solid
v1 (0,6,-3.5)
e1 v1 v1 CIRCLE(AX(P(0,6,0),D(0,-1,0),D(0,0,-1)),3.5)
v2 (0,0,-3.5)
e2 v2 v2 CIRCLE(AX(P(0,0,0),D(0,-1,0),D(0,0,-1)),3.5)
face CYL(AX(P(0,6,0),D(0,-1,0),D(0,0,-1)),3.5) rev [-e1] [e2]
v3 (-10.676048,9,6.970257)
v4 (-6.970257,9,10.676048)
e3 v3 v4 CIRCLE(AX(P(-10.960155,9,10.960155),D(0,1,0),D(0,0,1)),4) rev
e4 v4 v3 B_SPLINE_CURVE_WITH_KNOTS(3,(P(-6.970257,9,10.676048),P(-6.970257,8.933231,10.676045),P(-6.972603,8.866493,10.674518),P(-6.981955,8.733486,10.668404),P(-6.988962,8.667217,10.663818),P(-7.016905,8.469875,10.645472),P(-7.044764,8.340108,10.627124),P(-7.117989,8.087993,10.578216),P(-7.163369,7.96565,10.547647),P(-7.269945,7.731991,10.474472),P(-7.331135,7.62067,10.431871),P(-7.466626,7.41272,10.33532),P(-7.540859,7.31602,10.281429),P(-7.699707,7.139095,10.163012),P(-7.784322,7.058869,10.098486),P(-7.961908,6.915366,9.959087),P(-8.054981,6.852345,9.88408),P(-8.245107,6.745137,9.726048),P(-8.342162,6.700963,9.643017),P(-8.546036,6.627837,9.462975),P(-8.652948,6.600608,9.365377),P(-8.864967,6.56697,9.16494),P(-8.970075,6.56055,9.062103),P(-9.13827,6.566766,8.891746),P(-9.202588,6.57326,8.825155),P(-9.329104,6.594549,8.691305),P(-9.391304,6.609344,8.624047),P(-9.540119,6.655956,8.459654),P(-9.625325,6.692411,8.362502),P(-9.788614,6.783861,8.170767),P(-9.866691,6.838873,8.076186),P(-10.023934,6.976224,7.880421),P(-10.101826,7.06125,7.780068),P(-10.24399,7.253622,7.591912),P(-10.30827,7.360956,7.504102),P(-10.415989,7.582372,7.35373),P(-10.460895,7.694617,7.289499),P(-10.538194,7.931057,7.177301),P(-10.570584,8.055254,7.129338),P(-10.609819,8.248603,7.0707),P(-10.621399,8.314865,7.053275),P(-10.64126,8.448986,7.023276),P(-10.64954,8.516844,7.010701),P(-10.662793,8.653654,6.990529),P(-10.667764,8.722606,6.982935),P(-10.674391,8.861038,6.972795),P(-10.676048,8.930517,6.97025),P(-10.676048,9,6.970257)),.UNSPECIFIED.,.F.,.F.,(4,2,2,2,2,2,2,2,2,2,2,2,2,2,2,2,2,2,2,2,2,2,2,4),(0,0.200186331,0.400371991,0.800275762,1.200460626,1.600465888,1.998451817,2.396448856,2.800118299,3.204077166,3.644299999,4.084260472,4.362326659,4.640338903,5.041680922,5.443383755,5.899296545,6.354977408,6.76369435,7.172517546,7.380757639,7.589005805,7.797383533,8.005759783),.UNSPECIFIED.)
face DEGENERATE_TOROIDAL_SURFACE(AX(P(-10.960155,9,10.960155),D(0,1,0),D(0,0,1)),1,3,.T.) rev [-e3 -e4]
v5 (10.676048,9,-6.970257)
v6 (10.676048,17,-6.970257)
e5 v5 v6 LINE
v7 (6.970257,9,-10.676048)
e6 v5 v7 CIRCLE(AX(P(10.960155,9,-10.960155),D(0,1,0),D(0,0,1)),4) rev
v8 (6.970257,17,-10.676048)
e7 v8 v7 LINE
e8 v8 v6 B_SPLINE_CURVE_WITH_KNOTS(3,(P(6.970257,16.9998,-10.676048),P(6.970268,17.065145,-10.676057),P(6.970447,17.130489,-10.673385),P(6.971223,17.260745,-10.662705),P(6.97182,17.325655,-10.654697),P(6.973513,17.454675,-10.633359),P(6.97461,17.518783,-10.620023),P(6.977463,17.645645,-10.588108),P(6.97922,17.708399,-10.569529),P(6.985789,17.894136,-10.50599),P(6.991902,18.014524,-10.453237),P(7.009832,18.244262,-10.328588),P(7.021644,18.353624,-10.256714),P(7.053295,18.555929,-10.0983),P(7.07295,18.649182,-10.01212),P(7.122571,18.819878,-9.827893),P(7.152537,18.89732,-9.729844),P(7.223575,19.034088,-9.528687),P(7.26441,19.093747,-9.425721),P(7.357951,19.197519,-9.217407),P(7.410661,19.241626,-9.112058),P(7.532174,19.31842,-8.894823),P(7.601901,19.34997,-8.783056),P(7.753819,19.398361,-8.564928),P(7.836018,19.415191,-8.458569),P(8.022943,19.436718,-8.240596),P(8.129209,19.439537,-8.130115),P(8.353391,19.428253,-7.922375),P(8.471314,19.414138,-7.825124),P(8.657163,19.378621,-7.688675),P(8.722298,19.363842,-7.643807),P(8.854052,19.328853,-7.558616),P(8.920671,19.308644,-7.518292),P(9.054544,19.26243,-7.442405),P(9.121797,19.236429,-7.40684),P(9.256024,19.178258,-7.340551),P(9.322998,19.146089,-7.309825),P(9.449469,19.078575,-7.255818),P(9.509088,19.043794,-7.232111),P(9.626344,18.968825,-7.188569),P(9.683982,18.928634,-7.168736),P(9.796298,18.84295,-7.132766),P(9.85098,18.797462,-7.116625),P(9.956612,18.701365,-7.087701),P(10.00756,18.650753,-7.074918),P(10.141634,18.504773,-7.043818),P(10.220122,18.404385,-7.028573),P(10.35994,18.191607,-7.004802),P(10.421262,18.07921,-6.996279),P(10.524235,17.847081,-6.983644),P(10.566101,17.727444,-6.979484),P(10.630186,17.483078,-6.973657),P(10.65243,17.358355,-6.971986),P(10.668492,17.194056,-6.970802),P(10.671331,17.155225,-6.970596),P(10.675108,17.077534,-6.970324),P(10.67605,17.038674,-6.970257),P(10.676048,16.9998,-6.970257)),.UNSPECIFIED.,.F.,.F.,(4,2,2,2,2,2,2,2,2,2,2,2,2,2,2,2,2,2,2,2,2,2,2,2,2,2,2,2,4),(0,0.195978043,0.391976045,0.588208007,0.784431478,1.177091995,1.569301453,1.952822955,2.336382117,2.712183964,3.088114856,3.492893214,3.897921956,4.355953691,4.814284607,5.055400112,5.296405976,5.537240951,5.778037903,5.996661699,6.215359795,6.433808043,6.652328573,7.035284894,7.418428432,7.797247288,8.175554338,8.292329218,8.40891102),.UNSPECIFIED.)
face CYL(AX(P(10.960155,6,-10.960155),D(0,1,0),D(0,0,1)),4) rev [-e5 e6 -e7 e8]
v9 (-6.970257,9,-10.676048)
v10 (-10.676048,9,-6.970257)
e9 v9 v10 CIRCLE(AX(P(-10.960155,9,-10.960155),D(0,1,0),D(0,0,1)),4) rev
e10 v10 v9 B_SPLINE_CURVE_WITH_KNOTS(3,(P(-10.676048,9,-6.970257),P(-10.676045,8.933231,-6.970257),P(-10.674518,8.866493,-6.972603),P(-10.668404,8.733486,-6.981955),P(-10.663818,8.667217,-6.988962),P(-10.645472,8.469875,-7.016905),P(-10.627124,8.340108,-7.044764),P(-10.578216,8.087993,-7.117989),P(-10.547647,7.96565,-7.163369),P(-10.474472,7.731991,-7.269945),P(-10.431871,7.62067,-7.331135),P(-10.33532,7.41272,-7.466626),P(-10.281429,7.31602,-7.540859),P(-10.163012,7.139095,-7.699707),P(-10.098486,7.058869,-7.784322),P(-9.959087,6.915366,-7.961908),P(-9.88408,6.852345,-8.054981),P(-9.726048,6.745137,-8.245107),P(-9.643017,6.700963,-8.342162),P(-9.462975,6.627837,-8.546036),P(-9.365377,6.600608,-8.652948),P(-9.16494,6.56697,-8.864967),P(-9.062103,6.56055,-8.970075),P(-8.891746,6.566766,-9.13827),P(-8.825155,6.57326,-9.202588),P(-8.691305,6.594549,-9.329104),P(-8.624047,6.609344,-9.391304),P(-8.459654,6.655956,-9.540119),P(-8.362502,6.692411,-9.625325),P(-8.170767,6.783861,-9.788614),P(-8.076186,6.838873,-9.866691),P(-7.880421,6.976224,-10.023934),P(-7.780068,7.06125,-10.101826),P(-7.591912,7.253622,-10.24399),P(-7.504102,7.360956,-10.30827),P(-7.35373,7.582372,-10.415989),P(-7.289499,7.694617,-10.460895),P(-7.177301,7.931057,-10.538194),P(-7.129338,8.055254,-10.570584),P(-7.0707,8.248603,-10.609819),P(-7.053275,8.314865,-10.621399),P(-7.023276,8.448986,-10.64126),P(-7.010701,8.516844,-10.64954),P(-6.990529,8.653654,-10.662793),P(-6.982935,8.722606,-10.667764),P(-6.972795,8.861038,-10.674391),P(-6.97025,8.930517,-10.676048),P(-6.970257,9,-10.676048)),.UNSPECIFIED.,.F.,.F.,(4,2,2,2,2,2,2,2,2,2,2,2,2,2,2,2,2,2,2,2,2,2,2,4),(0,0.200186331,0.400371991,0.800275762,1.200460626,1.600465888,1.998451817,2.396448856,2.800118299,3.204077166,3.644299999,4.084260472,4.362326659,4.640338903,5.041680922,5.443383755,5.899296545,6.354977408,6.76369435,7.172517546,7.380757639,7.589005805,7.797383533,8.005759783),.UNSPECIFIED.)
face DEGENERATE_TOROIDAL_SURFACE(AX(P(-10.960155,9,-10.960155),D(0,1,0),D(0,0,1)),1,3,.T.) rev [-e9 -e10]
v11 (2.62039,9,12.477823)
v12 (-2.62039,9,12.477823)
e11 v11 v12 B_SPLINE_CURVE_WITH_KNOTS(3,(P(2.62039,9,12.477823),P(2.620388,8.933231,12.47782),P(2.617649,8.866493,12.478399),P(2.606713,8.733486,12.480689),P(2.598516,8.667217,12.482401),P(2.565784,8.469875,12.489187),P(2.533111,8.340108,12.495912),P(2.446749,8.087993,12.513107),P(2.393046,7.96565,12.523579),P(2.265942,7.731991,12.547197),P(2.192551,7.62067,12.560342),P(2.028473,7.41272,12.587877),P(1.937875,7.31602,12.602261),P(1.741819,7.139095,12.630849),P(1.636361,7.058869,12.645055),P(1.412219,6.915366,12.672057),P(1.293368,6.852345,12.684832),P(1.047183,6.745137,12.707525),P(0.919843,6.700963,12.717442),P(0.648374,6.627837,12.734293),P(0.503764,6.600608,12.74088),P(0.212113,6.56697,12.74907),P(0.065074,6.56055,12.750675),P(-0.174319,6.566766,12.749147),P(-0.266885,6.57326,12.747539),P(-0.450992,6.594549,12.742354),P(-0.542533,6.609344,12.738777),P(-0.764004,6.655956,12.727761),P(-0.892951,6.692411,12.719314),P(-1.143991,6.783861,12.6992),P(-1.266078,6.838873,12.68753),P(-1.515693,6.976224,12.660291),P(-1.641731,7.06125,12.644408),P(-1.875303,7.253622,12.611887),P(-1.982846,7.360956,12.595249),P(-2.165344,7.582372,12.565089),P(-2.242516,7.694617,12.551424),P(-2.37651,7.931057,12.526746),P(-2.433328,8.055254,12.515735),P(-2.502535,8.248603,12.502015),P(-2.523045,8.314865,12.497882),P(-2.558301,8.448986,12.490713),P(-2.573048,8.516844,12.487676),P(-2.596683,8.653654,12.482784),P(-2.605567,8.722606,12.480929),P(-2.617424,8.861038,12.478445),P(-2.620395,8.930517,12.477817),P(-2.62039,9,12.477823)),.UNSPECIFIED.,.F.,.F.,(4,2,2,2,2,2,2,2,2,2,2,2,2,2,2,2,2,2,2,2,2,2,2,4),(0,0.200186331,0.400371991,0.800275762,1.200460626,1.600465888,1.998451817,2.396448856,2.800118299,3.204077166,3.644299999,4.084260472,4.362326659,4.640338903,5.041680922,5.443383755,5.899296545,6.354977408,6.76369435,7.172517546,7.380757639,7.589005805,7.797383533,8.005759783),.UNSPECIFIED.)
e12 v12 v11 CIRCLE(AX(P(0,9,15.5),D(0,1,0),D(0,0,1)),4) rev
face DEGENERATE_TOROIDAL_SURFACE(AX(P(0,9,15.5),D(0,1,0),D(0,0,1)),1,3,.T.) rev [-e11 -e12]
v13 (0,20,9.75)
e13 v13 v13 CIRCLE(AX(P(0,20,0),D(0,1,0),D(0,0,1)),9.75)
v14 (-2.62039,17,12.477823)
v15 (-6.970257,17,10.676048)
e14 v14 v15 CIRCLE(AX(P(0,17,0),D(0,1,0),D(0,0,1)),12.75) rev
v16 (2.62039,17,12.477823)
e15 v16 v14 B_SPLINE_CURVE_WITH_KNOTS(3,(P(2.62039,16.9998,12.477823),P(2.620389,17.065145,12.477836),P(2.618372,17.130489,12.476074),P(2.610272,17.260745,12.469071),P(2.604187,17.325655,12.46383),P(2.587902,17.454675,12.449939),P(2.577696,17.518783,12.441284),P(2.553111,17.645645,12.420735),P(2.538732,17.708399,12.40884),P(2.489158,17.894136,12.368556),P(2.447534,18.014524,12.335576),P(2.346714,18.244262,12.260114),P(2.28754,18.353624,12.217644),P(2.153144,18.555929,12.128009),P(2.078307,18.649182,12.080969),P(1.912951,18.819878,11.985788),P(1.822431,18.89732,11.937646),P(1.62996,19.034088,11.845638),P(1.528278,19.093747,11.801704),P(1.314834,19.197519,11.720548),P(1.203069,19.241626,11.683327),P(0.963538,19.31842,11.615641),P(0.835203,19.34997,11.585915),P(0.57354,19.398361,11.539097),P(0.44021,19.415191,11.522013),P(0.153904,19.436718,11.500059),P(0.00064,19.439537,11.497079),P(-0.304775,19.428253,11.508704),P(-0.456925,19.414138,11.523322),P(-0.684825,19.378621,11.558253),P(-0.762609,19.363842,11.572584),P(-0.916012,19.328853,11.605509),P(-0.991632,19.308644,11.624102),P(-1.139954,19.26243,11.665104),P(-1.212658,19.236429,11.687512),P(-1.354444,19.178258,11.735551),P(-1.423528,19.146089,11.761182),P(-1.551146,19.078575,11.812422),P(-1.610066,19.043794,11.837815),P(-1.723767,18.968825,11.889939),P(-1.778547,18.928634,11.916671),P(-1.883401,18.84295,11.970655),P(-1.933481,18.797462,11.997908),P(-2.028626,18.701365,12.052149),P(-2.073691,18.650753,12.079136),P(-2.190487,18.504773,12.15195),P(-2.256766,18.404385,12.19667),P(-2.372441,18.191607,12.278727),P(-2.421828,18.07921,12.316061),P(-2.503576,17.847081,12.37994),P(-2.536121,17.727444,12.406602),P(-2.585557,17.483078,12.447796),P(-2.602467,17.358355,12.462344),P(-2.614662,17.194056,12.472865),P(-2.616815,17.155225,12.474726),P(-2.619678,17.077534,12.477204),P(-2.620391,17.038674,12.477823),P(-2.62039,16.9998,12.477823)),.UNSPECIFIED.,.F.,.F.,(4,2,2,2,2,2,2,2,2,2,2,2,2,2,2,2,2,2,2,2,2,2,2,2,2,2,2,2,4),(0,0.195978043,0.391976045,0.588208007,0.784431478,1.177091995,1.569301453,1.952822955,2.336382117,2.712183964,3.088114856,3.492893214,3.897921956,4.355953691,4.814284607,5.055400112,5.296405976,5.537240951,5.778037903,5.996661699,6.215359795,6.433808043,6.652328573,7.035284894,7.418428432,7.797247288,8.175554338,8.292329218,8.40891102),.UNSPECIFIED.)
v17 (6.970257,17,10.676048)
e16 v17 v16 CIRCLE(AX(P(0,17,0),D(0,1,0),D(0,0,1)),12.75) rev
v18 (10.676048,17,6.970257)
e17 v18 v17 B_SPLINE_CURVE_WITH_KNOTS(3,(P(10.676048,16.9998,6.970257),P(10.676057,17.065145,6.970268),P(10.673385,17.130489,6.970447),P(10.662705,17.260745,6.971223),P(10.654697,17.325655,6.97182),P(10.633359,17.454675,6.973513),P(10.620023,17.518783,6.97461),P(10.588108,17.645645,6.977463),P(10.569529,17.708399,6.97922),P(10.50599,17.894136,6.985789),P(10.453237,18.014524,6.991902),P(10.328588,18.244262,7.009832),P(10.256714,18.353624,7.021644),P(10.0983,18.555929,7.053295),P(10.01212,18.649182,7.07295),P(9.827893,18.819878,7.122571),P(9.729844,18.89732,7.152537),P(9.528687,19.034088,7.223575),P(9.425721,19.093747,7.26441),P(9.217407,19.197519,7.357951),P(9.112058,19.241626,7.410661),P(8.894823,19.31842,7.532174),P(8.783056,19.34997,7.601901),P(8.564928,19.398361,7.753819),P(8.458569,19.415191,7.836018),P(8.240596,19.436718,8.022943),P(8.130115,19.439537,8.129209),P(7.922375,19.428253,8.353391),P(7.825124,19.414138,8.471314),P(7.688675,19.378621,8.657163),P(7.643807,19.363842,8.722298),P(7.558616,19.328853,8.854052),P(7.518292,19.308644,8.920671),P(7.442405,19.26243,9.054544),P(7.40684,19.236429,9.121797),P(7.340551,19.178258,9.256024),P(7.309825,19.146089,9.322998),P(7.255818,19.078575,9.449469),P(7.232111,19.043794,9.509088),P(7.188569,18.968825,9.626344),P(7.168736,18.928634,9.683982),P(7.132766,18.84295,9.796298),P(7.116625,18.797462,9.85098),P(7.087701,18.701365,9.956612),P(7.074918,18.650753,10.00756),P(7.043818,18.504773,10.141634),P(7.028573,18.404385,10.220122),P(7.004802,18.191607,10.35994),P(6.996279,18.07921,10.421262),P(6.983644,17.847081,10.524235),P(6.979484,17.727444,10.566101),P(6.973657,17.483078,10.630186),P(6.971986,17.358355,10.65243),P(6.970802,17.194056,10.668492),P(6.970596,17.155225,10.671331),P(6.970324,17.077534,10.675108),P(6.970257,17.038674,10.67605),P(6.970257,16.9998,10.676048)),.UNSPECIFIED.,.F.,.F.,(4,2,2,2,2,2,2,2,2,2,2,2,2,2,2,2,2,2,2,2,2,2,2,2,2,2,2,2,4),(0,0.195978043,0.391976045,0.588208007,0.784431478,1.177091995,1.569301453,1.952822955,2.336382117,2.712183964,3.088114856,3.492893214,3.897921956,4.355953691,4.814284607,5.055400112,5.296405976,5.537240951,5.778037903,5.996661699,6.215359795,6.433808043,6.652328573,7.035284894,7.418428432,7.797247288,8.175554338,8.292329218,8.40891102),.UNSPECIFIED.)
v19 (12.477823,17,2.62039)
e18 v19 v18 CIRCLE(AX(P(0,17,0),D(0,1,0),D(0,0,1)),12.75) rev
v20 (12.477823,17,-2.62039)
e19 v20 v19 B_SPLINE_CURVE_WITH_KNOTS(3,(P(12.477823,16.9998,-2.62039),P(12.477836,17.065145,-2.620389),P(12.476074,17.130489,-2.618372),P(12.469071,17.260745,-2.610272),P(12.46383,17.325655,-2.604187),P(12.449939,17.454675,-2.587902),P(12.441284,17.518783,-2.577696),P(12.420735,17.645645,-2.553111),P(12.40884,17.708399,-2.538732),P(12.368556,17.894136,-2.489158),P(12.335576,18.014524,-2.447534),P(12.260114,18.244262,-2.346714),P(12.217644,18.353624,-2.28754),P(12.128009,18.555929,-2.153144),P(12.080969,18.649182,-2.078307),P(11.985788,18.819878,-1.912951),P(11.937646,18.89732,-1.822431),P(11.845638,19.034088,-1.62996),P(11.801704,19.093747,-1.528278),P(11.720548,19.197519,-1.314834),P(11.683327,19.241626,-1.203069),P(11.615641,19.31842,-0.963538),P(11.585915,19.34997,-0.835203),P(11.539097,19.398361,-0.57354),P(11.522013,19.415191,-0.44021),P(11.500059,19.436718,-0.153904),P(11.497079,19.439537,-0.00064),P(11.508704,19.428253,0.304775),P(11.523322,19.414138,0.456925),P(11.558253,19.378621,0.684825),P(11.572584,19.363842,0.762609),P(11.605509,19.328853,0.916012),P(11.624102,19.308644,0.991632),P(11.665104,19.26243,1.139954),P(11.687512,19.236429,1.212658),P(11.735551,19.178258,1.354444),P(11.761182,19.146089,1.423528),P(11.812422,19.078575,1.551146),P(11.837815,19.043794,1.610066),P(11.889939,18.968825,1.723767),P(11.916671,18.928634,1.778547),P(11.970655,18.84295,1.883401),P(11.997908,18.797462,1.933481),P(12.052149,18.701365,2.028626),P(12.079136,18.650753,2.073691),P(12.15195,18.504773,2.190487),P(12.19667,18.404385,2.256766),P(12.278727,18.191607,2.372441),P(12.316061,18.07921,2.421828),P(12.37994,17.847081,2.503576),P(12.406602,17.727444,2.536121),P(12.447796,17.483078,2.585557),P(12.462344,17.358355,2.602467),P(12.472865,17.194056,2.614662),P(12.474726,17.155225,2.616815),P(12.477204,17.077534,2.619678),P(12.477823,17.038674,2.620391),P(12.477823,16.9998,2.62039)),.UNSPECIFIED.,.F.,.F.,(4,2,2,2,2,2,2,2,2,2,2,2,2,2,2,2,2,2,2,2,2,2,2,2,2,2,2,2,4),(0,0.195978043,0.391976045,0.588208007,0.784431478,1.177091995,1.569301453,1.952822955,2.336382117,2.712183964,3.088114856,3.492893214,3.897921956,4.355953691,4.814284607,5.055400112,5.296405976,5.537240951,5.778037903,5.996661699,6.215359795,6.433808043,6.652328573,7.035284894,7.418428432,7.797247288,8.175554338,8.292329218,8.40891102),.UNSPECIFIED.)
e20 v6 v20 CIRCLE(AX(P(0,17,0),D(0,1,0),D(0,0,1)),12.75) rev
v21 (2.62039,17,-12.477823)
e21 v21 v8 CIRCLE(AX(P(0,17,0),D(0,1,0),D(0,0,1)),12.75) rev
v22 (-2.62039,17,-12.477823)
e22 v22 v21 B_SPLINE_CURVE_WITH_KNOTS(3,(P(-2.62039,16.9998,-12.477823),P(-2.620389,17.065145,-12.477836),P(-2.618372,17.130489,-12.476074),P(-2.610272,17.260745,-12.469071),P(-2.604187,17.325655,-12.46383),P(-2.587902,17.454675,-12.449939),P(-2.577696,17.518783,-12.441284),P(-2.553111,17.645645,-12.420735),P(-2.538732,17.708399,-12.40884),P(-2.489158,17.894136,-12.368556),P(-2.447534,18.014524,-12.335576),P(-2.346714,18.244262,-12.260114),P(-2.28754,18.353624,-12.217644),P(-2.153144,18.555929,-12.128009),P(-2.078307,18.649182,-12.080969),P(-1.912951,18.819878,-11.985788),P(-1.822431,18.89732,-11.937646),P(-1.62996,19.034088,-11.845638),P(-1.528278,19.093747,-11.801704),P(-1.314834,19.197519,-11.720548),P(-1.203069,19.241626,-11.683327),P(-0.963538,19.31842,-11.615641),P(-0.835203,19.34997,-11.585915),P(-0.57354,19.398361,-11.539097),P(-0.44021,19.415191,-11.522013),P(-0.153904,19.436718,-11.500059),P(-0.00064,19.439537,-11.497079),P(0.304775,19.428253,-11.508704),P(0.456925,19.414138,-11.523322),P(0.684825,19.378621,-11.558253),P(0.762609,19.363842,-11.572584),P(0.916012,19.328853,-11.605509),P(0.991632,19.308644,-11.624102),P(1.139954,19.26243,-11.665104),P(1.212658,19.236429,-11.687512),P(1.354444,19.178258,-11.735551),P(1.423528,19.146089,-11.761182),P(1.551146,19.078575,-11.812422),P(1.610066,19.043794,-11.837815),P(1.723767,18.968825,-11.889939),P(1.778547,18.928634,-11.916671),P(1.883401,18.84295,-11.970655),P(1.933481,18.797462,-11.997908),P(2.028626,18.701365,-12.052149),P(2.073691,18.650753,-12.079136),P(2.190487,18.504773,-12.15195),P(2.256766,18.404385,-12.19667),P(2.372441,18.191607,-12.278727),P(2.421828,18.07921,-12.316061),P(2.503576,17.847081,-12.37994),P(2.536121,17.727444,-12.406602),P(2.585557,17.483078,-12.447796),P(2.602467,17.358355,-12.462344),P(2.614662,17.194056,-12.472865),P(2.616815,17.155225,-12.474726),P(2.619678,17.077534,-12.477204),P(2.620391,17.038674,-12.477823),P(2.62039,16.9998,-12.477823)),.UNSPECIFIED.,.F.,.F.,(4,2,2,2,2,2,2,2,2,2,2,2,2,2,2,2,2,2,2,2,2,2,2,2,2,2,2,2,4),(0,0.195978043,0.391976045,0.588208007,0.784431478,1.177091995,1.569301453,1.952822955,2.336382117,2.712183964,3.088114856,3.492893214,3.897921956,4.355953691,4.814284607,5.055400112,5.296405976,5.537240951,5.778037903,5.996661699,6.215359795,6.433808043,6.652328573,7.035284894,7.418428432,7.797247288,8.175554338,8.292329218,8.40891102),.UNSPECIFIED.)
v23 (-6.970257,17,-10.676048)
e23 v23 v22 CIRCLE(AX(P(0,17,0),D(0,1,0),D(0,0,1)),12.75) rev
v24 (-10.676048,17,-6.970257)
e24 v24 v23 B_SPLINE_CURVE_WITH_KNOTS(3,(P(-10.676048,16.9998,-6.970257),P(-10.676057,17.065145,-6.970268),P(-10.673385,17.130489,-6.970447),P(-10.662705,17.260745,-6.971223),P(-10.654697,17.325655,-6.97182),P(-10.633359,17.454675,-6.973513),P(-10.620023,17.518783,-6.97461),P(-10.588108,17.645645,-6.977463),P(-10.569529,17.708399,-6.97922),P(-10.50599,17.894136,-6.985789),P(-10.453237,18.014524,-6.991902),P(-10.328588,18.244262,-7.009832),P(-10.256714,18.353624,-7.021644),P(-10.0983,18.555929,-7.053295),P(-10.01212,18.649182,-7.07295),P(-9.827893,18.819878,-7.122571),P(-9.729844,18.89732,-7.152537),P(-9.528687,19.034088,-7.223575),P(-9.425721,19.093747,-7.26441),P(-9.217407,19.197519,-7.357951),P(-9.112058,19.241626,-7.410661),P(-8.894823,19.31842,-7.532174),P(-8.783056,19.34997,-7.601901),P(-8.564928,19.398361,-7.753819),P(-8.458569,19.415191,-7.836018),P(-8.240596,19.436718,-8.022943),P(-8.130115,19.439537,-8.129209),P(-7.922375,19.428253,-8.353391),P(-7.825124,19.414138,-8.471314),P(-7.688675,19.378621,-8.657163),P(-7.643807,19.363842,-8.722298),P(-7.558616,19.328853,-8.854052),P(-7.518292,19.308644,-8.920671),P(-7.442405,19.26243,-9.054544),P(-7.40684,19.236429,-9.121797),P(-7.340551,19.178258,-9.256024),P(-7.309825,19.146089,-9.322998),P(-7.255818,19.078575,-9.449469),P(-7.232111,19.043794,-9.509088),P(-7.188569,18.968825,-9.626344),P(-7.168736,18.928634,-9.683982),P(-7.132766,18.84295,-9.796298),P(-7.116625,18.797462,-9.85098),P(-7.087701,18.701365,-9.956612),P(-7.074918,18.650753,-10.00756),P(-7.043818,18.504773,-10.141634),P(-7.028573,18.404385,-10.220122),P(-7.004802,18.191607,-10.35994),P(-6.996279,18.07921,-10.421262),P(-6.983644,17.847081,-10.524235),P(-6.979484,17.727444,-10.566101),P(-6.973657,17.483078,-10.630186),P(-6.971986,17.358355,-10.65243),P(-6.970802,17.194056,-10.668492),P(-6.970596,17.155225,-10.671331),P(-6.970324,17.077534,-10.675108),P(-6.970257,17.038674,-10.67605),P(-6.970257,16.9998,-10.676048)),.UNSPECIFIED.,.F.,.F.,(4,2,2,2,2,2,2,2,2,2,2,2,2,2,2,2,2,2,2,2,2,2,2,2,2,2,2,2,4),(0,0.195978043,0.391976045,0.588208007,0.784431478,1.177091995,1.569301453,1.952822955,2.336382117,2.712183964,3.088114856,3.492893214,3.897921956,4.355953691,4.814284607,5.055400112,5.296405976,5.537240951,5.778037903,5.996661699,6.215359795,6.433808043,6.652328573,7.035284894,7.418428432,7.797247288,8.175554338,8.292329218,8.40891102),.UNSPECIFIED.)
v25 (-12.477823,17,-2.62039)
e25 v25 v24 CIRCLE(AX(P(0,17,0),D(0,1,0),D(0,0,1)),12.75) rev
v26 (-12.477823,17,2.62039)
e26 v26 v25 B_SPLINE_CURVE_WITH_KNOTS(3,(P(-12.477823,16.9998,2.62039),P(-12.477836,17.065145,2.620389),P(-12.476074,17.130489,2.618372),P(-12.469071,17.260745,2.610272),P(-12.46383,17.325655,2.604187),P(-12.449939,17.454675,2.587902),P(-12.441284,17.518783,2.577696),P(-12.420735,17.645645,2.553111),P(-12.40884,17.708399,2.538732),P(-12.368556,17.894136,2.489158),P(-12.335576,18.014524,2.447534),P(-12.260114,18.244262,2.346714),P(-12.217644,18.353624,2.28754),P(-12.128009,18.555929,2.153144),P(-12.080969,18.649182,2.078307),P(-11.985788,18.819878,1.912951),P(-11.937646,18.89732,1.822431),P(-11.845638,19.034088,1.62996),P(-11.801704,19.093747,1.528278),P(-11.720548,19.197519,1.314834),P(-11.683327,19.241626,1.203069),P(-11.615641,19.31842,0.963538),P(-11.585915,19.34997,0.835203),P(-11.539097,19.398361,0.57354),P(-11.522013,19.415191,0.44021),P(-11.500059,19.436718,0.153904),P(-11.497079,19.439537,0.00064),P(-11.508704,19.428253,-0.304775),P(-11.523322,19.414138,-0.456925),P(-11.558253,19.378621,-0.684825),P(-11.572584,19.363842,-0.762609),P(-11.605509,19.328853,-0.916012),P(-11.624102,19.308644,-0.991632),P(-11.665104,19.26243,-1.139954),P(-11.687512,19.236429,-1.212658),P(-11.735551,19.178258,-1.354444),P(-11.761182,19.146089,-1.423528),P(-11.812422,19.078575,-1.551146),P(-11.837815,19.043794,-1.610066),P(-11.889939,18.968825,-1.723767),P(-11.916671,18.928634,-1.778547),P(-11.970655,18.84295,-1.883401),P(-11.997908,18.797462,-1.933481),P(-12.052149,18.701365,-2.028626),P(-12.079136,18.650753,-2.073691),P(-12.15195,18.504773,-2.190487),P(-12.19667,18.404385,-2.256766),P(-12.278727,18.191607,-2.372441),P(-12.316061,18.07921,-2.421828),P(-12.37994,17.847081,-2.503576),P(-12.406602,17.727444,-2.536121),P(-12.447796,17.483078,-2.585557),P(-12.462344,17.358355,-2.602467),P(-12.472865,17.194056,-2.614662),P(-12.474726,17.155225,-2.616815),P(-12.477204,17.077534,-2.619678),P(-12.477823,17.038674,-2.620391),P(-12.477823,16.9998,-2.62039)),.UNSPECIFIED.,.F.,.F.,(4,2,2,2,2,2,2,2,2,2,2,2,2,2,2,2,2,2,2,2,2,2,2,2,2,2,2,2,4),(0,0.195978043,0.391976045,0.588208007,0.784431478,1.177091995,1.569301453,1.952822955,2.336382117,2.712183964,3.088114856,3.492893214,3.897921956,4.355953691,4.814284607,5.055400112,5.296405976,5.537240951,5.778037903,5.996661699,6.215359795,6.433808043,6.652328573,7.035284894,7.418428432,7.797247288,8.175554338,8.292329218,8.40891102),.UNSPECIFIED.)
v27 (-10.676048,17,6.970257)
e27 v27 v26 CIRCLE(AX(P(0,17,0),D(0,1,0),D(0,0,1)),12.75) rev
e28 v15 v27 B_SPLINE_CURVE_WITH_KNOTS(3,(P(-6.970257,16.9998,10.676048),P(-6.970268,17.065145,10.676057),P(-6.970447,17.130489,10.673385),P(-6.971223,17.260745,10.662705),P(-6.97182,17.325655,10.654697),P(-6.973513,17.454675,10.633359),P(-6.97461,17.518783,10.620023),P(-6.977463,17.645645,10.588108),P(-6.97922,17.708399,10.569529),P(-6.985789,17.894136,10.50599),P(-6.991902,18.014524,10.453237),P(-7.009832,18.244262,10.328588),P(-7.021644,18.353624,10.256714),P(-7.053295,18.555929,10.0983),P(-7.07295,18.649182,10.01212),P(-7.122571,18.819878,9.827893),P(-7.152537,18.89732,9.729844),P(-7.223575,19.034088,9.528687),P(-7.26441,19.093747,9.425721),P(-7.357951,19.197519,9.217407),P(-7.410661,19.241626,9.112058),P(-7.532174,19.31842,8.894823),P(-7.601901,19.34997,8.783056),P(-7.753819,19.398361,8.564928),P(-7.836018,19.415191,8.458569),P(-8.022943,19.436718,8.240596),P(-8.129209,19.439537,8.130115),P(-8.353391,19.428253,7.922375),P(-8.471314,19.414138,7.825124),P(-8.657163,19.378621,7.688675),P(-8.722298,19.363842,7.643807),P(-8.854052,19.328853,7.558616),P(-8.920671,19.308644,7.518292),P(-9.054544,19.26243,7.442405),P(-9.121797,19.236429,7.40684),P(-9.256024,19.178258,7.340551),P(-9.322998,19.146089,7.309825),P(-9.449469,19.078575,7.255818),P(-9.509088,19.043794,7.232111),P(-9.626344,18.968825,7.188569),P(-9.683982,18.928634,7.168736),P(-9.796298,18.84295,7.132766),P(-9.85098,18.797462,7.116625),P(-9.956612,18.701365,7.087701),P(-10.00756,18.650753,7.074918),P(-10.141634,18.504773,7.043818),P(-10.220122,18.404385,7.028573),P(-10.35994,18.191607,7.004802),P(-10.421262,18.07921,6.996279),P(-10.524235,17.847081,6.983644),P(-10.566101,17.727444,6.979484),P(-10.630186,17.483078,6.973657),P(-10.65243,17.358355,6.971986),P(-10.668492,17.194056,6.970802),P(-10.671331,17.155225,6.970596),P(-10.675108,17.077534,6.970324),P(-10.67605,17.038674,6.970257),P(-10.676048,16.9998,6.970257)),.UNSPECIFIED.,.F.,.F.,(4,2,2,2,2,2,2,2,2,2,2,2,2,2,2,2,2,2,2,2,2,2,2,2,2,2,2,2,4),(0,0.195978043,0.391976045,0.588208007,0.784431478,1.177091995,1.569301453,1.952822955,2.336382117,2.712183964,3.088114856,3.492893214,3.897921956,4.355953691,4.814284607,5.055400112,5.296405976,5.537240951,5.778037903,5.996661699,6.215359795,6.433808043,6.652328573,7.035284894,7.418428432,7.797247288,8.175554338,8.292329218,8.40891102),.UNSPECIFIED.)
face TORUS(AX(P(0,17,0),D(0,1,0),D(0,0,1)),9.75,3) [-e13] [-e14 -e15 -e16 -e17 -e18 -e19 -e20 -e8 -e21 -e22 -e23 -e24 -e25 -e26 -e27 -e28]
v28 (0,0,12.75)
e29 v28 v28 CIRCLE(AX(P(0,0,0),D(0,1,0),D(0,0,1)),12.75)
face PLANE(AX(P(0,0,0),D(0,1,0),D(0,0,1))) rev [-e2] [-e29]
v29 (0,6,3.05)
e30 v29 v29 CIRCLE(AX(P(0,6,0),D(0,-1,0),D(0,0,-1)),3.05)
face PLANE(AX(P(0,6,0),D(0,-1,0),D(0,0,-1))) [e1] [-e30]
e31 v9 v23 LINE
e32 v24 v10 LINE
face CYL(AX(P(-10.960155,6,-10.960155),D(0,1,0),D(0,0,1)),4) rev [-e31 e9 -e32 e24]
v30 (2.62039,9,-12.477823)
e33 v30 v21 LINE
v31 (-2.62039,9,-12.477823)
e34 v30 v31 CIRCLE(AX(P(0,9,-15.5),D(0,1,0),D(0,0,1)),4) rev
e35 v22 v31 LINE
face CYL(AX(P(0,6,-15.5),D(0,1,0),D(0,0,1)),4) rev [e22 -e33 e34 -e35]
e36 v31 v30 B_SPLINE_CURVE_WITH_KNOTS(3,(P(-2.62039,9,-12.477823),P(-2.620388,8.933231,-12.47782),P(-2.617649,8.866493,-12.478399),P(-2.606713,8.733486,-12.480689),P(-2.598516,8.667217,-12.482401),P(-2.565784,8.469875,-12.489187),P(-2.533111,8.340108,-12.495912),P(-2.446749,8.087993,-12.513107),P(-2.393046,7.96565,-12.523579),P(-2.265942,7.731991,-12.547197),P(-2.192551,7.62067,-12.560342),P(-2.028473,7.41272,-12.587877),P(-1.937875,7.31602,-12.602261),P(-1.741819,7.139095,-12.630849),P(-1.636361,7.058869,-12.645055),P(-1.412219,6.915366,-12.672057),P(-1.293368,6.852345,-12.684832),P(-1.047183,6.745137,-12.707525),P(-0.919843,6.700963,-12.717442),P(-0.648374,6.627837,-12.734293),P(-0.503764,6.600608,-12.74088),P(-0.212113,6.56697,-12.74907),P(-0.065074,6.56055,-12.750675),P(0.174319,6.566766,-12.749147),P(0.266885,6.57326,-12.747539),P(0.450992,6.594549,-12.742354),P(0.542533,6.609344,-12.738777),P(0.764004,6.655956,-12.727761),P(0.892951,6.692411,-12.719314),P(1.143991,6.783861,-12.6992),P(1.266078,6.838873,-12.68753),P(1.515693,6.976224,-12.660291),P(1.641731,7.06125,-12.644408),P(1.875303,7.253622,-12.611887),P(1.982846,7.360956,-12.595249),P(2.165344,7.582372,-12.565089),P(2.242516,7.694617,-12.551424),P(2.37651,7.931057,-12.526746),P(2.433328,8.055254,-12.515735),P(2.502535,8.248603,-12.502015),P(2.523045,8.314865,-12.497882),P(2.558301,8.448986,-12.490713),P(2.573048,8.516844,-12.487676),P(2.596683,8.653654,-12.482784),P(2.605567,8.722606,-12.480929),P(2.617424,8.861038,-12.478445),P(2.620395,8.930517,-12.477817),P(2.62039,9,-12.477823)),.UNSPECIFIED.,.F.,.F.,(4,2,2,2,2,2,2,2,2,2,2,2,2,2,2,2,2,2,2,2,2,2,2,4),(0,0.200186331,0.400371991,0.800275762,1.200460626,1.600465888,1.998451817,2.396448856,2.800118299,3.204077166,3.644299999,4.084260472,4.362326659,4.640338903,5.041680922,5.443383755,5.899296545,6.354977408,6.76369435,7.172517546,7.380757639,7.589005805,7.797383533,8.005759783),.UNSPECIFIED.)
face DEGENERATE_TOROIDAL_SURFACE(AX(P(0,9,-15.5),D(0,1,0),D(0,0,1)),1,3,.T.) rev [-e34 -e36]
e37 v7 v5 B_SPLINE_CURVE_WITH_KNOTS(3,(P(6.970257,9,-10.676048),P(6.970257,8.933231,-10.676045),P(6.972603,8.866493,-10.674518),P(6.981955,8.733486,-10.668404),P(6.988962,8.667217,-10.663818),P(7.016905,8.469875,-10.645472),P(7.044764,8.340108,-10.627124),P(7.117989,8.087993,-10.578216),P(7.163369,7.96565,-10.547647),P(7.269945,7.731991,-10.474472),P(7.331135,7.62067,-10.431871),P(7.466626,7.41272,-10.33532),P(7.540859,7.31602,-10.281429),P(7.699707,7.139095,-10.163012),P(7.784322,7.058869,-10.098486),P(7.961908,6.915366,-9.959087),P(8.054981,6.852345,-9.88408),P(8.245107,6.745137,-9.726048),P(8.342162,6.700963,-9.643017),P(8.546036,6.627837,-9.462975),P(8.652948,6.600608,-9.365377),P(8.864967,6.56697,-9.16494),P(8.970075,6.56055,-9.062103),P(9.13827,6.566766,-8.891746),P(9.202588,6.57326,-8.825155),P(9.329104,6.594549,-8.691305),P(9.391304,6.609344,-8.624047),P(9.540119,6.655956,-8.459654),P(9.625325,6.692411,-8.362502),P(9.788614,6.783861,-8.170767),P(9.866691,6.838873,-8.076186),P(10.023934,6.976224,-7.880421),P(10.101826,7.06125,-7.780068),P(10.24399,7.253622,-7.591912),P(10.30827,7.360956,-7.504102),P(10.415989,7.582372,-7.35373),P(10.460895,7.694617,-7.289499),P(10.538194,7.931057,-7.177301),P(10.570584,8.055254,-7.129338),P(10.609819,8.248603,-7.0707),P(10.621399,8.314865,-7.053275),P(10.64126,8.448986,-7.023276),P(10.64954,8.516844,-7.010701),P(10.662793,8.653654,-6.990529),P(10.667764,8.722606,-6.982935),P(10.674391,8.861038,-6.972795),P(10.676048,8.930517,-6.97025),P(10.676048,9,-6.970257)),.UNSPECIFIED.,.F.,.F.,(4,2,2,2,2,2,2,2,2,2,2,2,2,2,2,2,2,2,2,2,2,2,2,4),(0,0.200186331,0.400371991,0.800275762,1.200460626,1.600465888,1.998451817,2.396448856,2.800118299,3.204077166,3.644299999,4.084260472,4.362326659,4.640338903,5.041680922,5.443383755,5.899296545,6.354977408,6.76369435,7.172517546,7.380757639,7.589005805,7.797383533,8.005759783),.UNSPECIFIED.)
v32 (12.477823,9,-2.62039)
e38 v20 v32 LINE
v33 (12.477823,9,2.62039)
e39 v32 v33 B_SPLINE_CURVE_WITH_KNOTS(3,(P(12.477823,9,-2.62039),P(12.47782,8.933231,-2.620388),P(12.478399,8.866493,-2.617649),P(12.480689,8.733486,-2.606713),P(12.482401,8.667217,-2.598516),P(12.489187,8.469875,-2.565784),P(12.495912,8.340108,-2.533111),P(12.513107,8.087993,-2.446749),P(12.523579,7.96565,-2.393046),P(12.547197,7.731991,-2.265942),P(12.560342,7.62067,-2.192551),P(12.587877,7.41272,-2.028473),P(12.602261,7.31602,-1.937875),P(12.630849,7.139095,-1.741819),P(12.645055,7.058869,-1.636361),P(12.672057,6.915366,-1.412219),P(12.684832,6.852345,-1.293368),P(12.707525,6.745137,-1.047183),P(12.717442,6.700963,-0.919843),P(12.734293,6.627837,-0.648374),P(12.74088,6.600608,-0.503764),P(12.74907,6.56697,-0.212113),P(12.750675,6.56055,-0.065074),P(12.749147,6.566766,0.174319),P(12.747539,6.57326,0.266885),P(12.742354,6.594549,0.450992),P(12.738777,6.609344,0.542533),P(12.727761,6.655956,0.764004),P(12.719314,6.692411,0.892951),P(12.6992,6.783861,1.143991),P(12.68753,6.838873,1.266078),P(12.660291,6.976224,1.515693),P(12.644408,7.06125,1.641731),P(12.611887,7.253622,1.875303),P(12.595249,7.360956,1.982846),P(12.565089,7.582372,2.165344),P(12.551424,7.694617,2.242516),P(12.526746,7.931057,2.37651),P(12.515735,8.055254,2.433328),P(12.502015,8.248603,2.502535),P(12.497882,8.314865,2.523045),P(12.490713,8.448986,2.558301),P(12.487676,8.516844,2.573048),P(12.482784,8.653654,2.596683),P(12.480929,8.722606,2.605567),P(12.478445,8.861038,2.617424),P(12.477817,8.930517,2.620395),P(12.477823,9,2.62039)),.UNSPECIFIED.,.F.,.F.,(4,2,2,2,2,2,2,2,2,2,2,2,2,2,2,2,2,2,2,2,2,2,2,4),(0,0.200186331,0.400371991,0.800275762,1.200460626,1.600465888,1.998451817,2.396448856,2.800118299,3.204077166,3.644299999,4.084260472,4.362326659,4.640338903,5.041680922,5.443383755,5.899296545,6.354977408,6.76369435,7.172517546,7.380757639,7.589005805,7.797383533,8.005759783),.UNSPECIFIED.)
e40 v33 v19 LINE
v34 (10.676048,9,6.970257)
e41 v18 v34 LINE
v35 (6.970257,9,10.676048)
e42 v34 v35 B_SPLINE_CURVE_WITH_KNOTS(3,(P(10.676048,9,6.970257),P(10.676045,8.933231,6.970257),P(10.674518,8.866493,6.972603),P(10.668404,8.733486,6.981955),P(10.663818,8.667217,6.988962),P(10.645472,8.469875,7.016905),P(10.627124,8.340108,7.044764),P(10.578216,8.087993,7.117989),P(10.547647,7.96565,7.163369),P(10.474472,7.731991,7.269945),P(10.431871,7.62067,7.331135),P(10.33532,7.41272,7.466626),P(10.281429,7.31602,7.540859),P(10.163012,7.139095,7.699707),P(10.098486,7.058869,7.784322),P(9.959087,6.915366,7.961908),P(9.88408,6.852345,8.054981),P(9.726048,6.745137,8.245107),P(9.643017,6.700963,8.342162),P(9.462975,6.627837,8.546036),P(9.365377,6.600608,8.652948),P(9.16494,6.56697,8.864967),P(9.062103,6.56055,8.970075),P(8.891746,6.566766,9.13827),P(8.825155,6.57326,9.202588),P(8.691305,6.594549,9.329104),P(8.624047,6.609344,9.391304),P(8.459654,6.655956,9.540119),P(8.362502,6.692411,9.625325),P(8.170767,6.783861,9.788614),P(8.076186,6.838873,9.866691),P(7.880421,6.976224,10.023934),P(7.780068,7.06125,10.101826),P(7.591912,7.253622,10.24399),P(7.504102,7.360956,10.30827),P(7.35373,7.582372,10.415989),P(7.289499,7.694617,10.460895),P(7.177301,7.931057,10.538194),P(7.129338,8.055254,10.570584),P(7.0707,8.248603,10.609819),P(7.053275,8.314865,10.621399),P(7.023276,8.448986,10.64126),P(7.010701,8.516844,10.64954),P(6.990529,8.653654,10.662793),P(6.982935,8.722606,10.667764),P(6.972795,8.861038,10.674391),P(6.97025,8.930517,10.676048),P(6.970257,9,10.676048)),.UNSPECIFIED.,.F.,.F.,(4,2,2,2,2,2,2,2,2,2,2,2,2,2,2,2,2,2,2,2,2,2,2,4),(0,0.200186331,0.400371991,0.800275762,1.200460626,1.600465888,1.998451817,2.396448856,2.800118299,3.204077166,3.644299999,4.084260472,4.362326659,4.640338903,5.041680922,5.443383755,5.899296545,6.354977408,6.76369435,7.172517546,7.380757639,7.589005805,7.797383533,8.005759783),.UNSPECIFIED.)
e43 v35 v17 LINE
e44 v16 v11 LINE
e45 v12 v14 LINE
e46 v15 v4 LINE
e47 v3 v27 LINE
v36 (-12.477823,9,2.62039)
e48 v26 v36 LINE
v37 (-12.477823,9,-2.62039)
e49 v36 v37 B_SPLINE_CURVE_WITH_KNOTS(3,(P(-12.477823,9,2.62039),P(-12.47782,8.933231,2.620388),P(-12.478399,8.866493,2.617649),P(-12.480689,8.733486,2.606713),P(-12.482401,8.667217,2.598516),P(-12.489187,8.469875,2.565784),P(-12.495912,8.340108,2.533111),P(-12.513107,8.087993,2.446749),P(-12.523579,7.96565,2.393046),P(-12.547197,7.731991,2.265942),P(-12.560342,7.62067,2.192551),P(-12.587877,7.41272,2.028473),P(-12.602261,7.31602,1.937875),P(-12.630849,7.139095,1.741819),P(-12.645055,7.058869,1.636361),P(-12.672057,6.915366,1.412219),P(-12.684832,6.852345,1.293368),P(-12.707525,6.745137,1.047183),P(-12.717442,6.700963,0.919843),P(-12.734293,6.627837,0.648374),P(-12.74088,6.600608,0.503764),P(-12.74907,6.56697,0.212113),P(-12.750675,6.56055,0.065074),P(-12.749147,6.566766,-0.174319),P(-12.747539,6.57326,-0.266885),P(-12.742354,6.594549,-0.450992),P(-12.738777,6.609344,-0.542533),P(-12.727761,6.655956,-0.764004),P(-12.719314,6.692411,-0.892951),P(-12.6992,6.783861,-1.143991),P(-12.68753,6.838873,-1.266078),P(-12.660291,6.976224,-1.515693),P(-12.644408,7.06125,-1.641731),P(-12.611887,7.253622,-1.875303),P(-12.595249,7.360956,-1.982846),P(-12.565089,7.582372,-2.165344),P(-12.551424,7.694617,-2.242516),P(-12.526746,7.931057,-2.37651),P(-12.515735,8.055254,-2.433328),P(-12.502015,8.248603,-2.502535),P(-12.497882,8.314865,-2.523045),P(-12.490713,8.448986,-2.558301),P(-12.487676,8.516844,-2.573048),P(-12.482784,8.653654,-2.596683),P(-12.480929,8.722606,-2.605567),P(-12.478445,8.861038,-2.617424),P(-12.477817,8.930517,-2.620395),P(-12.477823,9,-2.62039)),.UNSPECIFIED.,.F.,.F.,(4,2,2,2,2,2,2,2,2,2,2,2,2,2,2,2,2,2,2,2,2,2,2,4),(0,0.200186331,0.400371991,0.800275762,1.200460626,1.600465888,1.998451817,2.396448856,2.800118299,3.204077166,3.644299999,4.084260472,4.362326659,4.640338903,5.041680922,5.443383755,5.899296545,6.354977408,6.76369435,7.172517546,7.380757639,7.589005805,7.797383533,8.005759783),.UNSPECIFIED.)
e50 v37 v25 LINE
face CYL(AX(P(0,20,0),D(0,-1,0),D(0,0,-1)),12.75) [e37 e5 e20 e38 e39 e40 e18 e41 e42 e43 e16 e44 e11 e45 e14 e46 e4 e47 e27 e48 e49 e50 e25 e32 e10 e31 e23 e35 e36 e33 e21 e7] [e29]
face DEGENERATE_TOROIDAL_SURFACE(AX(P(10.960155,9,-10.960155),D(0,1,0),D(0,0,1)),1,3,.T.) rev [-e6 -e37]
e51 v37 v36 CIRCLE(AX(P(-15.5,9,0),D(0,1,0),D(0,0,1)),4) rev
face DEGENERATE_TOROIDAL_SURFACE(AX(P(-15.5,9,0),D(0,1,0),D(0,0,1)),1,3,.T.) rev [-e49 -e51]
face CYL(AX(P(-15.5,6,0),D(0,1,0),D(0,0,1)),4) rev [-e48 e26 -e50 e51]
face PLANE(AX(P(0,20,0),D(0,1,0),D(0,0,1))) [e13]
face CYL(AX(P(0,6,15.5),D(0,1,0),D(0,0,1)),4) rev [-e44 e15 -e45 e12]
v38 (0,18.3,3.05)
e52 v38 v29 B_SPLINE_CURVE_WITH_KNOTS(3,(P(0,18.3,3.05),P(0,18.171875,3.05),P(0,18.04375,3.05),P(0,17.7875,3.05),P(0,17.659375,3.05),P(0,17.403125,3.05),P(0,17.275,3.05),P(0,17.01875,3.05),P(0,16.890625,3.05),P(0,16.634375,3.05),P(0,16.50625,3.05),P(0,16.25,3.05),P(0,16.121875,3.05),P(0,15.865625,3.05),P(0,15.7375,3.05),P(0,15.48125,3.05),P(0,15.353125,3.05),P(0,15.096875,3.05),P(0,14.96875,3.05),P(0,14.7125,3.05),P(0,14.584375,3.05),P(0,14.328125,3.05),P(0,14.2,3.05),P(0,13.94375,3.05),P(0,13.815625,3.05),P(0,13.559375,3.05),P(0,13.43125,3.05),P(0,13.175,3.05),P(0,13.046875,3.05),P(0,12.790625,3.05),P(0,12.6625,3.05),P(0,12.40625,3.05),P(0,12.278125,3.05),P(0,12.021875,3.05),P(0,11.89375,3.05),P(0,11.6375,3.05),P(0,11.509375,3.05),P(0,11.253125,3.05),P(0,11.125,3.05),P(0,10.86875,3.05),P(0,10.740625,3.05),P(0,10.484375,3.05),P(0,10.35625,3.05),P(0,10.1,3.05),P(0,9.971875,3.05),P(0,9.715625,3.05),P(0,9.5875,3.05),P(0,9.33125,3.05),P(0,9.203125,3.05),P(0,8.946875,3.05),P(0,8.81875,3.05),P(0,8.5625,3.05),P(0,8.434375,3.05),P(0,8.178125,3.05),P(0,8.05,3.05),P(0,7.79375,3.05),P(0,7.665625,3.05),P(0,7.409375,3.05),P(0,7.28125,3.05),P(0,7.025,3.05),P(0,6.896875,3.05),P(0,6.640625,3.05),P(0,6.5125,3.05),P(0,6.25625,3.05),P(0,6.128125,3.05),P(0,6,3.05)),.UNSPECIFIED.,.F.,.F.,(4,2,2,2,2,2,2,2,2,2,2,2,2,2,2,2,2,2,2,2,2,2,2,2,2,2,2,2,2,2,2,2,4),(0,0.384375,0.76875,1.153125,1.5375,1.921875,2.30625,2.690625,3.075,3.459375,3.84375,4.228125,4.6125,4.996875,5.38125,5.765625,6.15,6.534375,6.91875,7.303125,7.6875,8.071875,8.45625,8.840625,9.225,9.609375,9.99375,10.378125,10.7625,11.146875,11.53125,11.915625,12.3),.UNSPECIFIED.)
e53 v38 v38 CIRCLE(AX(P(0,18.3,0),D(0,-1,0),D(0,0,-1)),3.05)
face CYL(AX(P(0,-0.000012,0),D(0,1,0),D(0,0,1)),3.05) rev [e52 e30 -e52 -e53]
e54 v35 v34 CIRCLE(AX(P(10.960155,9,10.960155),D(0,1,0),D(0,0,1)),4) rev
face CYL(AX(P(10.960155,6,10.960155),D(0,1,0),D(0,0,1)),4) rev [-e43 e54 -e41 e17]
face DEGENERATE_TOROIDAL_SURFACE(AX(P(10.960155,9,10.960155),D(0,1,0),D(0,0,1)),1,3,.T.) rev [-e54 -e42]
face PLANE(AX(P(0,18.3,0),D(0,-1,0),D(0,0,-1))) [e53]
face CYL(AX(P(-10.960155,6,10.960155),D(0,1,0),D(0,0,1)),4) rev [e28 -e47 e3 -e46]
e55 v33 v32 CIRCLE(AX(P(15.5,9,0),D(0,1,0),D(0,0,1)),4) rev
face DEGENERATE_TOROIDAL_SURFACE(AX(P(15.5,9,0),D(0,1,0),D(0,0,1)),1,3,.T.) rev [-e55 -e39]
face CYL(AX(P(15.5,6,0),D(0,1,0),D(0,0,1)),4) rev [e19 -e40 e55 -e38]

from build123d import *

# Parameters (mm, degrees)
SKETCH1_R               = 12.75
BOSS_EXTRUDE1_DEPTH     = 20
CUT_EXTRUDE1_DEPTH      = 27.928145127
CUT_EXTRUDE1_DEPTH_BACK = 18.3
SKETCH2_R               = 3.05
SKETCH3_R               = 3.5
CUT_EXTRUDE2_DEPTH      = 6
FILLET1_R               = 3
SKETCH5_R               = 4
CUT_EXTRUDE3_DEPTH      = 14
FILLET3_R               = 3


with BuildPart() as part:
    # Sketch1 → Boss-Extrude1 (new body)
    with BuildSketch(Plane(origin=(0, 0, 0), x_dir=(1, 0, 0), z_dir=(0, 1, 0))):
        with Locations(Location((0, 0, 0), (0, 0, 270))):
            Circle(SKETCH1_R)
    extrude(amount=BOSS_EXTRUDE1_DEPTH)

    # Sketch2 → Cut-Extrude1 (cut, two sides: drawn at the far end of the back side and taken through both)
    with BuildSketch(Plane.XZ.offset(-CUT_EXTRUDE1_DEPTH_BACK)):
        with Locations(Location((0, 0, 0), (0, 0, 90))):
            Circle(SKETCH2_R)
    extrude(amount=CUT_EXTRUDE1_DEPTH + CUT_EXTRUDE1_DEPTH_BACK, mode=Mode.SUBTRACT)

    # Sketch3 → Cut-Extrude2 (cut)
    with BuildSketch(Plane.XZ):
        with Locations(Location((0, 0, 0), (0, 0, 270))):
            Circle(SKETCH3_R)
    extrude(amount=-CUT_EXTRUDE2_DEPTH, mode=Mode.SUBTRACT)

    # Fillet1
    fillet1_edges = [part.edges().sort_by_distance(p)[0] for p in [
        (0, 20, -12.75),
    ]]
    fillet(fillet1_edges, radius=FILLET1_R)

    # Sketch5 → Cut-Extrude3 (cut)
    with BuildSketch(Plane(origin=(0, 20, 0), x_dir=(1, 0, 0), z_dir=(0, 1, 0))):
        with Locations((0, 15.5)):
            Circle(SKETCH5_R)
        with Locations((10.960155108, 10.960155108)):
            Circle(SKETCH5_R)
        with Locations((15.5, 0)):
            Circle(SKETCH5_R)
        with Locations((10.960155108, -10.960155108)):
            Circle(SKETCH5_R)
        with Locations((0, -15.5)):
            Circle(SKETCH5_R)
        with Locations((-10.960155108, -10.960155108)):
            Circle(SKETCH5_R)
        with Locations((-15.5, 0)):
            Circle(SKETCH5_R)
        with Locations((-10.960155108, 10.960155108)):
            Circle(SKETCH5_R)
    extrude(amount=-CUT_EXTRUDE3_DEPTH, mode=Mode.SUBTRACT)

    # Fillet3
    # the kernel refuses this fillet: 3 mm, written as the material it adds along each edge
    with BuildSketch(Plane(origin=(0, 6, 15.5), x_dir=(0.5240999982324142, 0, 0.8516567335803691), z_dir=(-0.8516567335803691, 0, 0.5240999982324142))) as fillet3_piece_1_section:
        with BuildLine():
            CenterArc((4 - FILLET3_R, FILLET3_R), FILLET3_R, 270, 90)
            Line((4 - FILLET3_R, 0), (4, 0))
            Line((4, 0), (4, FILLET3_R))
        make_face()
    fillet3_piece_1 = revolve(axis=Axis((0, 6, 15.5), (0, 1, 0)), revolution_arc=296.784649365, mode=Mode.PRIVATE)
    fillet3_piece_1 = fillet3_piece_1 & Plane(origin=(0, 6.906503108, 0), x_dir=(0, 0, 1), z_dir=(0, -1, 0)) * Cylinder(12.75, 17, mode=Mode.PRIVATE)
    add(fillet3_piece_1)
    with BuildSketch(Plane(origin=(-10.960155108, 6, 10.960155108), x_dir=(-0.2316175887878651, 0, 0.9728069143278617), z_dir=(-0.9728069143278617, 0, -0.2316175887878651))) as fillet3_piece_2_section:
        with BuildLine():
            CenterArc((4 - FILLET3_R, FILLET3_R), FILLET3_R, 270, 90)
            Line((4, FILLET3_R), (4, 0))
            Line((4, 0), (4 - FILLET3_R, 0))
        make_face()
    fillet3_piece_2 = revolve(axis=Axis((-10.960155108, 6, 10.960155108), (0, 1, 0)), revolution_arc=296.784649365, mode=Mode.PRIVATE)
    fillet3_piece_2 = fillet3_piece_2 & Plane(origin=(0, 6.906501973, 0), x_dir=(0, 0, 1), z_dir=(0, -1, 0)) * Cylinder(12.75, 16, mode=Mode.PRIVATE)
    add(fillet3_piece_2)
    with BuildSketch(Plane(origin=(-15.5, 6, 0), x_dir=(-0.8516567335803689, 0, -0.524099998232414), z_dir=(-0.524099998232414, 0, 0.8516567335803689))) as fillet3_piece_3_section:
        with BuildLine():
            CenterArc((4 - FILLET3_R, -FILLET3_R), FILLET3_R, 0, 90)
            Line((4, -FILLET3_R), (4, 0))
            Line((4, 0), (4 - FILLET3_R, 0))
        make_face()
    fillet3_piece_3 = revolve(axis=Axis((-15.5, 6, 0), (0, -1, 0)), revolution_arc=296.784649365, mode=Mode.PRIVATE)
    fillet3_piece_3 = fillet3_piece_3 & Plane(origin=(0, 6.90650195, 0), x_dir=(0, 0, 1), z_dir=(0, -1, 0)) * Cylinder(12.75, 16, mode=Mode.PRIVATE)
    add(fillet3_piece_3)
    with BuildSketch(Plane(origin=(-10.960155108, 6, -10.960155108), x_dir=(-0.9728069143278615, 0, -0.23161758878786548), z_dir=(0.23161758878786548, 0, -0.9728069143278615))) as fillet3_piece_4_section:
        with BuildLine():
            CenterArc((4 - FILLET3_R, FILLET3_R), FILLET3_R, 270, 90)
            Line((4, FILLET3_R), (4, 0))
            Line((4, 0), (4 - FILLET3_R, 0))
        make_face()
    fillet3_piece_4 = revolve(axis=Axis((-10.960155108, 6, -10.960155108), (0, 1, 0)), revolution_arc=296.784649365, mode=Mode.PRIVATE)
    fillet3_piece_4 = fillet3_piece_4 & Plane(origin=(0, 6.906501973, 0), x_dir=(0, 0, 1), z_dir=(0, -1, 0)) * Cylinder(12.75, 17, mode=Mode.PRIVATE)
    add(fillet3_piece_4)
    with BuildSketch(Plane(origin=(0, 6, -15.5), x_dir=(-0.5240999982324135, 0, -0.8516567335803694), z_dir=(0.8516567335803694, 0, -0.5240999982324135))) as fillet3_piece_5_section:
        with BuildLine():
            CenterArc((4 - FILLET3_R, FILLET3_R), FILLET3_R, 270, 90)
            Line((4, FILLET3_R), (4, 0))
            Line((4, 0), (4 - FILLET3_R, 0))
        make_face()
    fillet3_piece_5 = revolve(axis=Axis((0, 6, -15.5), (0, 1, 0)), revolution_arc=296.784649365, mode=Mode.PRIVATE)
    fillet3_piece_5 = fillet3_piece_5 & Plane(origin=(0, 6.906501973, 0), x_dir=(0, 0, 1), z_dir=(0, -1, 0)) * Cylinder(12.75, 16, mode=Mode.PRIVATE)
    add(fillet3_piece_5)
    with BuildSketch(Plane(origin=(10.960155108, 6, -10.960155108), x_dir=(0.2316175887878651, 0, -0.9728069143278617), z_dir=(0.9728069143278617, 0, 0.2316175887878651))) as fillet3_piece_6_section:
        with BuildLine():
            CenterArc((4 - FILLET3_R, FILLET3_R), FILLET3_R, 270, 90)
            Line((4, FILLET3_R), (4, 0))
            Line((4, 0), (4 - FILLET3_R, 0))
        make_face()
    fillet3_piece_6 = revolve(axis=Axis((10.960155108, 6, -10.960155108), (0, 1, 0)), revolution_arc=296.784649365, mode=Mode.PRIVATE)
    fillet3_piece_6 = fillet3_piece_6 & Plane(origin=(0, 6.906501973, 0), x_dir=(0, 0, 1), z_dir=(0, -1, 0)) * Cylinder(12.75, 16, mode=Mode.PRIVATE)
    add(fillet3_piece_6)
    with BuildSketch(Plane(origin=(15.5, 6, 0), x_dir=(0.8516567335803694, 0, -0.5240999982324135), z_dir=(0.5240999982324135, 0, 0.8516567335803694))) as fillet3_piece_7_section:
        with BuildLine():
            CenterArc((4 - FILLET3_R, FILLET3_R), FILLET3_R, 270, 90)
            Line((4, FILLET3_R), (4, 0))
            Line((4, 0), (4 - FILLET3_R, 0))
        make_face()
    fillet3_piece_7 = revolve(axis=Axis((15.5, 6, 0), (0, 1, 0)), revolution_arc=296.784649365, mode=Mode.PRIVATE)
    fillet3_piece_7 = fillet3_piece_7 & Plane(origin=(0, 6.906501973, 0), x_dir=(0, 0, 1), z_dir=(0, -1, 0)) * Cylinder(12.75, 17, mode=Mode.PRIVATE)
    add(fillet3_piece_7)
    with BuildSketch(Plane(origin=(10.960155108, 6, 10.960155108), x_dir=(0.9728069143278617, 0, 0.2316175887878651), z_dir=(-0.2316175887878651, 0, 0.9728069143278617))) as fillet3_piece_8_section:
        with BuildLine():
            CenterArc((4 - FILLET3_R, FILLET3_R), FILLET3_R, 270, 90)
            Line((4, FILLET3_R), (4, 0))
            Line((4, 0), (4 - FILLET3_R, 0))
        make_face()
    fillet3_piece_8 = revolve(axis=Axis((10.960155108, 6, 10.960155108), (0, 1, 0)), revolution_arc=296.784649365, mode=Mode.PRIVATE)
    fillet3_piece_8 = fillet3_piece_8 & Plane(origin=(0, 6.906501973, 0), x_dir=(0, 0, 1), z_dir=(0, -1, 0)) * Cylinder(12.75, 16, mode=Mode.PRIVATE)
    add(fillet3_piece_8)


solid = part.part
